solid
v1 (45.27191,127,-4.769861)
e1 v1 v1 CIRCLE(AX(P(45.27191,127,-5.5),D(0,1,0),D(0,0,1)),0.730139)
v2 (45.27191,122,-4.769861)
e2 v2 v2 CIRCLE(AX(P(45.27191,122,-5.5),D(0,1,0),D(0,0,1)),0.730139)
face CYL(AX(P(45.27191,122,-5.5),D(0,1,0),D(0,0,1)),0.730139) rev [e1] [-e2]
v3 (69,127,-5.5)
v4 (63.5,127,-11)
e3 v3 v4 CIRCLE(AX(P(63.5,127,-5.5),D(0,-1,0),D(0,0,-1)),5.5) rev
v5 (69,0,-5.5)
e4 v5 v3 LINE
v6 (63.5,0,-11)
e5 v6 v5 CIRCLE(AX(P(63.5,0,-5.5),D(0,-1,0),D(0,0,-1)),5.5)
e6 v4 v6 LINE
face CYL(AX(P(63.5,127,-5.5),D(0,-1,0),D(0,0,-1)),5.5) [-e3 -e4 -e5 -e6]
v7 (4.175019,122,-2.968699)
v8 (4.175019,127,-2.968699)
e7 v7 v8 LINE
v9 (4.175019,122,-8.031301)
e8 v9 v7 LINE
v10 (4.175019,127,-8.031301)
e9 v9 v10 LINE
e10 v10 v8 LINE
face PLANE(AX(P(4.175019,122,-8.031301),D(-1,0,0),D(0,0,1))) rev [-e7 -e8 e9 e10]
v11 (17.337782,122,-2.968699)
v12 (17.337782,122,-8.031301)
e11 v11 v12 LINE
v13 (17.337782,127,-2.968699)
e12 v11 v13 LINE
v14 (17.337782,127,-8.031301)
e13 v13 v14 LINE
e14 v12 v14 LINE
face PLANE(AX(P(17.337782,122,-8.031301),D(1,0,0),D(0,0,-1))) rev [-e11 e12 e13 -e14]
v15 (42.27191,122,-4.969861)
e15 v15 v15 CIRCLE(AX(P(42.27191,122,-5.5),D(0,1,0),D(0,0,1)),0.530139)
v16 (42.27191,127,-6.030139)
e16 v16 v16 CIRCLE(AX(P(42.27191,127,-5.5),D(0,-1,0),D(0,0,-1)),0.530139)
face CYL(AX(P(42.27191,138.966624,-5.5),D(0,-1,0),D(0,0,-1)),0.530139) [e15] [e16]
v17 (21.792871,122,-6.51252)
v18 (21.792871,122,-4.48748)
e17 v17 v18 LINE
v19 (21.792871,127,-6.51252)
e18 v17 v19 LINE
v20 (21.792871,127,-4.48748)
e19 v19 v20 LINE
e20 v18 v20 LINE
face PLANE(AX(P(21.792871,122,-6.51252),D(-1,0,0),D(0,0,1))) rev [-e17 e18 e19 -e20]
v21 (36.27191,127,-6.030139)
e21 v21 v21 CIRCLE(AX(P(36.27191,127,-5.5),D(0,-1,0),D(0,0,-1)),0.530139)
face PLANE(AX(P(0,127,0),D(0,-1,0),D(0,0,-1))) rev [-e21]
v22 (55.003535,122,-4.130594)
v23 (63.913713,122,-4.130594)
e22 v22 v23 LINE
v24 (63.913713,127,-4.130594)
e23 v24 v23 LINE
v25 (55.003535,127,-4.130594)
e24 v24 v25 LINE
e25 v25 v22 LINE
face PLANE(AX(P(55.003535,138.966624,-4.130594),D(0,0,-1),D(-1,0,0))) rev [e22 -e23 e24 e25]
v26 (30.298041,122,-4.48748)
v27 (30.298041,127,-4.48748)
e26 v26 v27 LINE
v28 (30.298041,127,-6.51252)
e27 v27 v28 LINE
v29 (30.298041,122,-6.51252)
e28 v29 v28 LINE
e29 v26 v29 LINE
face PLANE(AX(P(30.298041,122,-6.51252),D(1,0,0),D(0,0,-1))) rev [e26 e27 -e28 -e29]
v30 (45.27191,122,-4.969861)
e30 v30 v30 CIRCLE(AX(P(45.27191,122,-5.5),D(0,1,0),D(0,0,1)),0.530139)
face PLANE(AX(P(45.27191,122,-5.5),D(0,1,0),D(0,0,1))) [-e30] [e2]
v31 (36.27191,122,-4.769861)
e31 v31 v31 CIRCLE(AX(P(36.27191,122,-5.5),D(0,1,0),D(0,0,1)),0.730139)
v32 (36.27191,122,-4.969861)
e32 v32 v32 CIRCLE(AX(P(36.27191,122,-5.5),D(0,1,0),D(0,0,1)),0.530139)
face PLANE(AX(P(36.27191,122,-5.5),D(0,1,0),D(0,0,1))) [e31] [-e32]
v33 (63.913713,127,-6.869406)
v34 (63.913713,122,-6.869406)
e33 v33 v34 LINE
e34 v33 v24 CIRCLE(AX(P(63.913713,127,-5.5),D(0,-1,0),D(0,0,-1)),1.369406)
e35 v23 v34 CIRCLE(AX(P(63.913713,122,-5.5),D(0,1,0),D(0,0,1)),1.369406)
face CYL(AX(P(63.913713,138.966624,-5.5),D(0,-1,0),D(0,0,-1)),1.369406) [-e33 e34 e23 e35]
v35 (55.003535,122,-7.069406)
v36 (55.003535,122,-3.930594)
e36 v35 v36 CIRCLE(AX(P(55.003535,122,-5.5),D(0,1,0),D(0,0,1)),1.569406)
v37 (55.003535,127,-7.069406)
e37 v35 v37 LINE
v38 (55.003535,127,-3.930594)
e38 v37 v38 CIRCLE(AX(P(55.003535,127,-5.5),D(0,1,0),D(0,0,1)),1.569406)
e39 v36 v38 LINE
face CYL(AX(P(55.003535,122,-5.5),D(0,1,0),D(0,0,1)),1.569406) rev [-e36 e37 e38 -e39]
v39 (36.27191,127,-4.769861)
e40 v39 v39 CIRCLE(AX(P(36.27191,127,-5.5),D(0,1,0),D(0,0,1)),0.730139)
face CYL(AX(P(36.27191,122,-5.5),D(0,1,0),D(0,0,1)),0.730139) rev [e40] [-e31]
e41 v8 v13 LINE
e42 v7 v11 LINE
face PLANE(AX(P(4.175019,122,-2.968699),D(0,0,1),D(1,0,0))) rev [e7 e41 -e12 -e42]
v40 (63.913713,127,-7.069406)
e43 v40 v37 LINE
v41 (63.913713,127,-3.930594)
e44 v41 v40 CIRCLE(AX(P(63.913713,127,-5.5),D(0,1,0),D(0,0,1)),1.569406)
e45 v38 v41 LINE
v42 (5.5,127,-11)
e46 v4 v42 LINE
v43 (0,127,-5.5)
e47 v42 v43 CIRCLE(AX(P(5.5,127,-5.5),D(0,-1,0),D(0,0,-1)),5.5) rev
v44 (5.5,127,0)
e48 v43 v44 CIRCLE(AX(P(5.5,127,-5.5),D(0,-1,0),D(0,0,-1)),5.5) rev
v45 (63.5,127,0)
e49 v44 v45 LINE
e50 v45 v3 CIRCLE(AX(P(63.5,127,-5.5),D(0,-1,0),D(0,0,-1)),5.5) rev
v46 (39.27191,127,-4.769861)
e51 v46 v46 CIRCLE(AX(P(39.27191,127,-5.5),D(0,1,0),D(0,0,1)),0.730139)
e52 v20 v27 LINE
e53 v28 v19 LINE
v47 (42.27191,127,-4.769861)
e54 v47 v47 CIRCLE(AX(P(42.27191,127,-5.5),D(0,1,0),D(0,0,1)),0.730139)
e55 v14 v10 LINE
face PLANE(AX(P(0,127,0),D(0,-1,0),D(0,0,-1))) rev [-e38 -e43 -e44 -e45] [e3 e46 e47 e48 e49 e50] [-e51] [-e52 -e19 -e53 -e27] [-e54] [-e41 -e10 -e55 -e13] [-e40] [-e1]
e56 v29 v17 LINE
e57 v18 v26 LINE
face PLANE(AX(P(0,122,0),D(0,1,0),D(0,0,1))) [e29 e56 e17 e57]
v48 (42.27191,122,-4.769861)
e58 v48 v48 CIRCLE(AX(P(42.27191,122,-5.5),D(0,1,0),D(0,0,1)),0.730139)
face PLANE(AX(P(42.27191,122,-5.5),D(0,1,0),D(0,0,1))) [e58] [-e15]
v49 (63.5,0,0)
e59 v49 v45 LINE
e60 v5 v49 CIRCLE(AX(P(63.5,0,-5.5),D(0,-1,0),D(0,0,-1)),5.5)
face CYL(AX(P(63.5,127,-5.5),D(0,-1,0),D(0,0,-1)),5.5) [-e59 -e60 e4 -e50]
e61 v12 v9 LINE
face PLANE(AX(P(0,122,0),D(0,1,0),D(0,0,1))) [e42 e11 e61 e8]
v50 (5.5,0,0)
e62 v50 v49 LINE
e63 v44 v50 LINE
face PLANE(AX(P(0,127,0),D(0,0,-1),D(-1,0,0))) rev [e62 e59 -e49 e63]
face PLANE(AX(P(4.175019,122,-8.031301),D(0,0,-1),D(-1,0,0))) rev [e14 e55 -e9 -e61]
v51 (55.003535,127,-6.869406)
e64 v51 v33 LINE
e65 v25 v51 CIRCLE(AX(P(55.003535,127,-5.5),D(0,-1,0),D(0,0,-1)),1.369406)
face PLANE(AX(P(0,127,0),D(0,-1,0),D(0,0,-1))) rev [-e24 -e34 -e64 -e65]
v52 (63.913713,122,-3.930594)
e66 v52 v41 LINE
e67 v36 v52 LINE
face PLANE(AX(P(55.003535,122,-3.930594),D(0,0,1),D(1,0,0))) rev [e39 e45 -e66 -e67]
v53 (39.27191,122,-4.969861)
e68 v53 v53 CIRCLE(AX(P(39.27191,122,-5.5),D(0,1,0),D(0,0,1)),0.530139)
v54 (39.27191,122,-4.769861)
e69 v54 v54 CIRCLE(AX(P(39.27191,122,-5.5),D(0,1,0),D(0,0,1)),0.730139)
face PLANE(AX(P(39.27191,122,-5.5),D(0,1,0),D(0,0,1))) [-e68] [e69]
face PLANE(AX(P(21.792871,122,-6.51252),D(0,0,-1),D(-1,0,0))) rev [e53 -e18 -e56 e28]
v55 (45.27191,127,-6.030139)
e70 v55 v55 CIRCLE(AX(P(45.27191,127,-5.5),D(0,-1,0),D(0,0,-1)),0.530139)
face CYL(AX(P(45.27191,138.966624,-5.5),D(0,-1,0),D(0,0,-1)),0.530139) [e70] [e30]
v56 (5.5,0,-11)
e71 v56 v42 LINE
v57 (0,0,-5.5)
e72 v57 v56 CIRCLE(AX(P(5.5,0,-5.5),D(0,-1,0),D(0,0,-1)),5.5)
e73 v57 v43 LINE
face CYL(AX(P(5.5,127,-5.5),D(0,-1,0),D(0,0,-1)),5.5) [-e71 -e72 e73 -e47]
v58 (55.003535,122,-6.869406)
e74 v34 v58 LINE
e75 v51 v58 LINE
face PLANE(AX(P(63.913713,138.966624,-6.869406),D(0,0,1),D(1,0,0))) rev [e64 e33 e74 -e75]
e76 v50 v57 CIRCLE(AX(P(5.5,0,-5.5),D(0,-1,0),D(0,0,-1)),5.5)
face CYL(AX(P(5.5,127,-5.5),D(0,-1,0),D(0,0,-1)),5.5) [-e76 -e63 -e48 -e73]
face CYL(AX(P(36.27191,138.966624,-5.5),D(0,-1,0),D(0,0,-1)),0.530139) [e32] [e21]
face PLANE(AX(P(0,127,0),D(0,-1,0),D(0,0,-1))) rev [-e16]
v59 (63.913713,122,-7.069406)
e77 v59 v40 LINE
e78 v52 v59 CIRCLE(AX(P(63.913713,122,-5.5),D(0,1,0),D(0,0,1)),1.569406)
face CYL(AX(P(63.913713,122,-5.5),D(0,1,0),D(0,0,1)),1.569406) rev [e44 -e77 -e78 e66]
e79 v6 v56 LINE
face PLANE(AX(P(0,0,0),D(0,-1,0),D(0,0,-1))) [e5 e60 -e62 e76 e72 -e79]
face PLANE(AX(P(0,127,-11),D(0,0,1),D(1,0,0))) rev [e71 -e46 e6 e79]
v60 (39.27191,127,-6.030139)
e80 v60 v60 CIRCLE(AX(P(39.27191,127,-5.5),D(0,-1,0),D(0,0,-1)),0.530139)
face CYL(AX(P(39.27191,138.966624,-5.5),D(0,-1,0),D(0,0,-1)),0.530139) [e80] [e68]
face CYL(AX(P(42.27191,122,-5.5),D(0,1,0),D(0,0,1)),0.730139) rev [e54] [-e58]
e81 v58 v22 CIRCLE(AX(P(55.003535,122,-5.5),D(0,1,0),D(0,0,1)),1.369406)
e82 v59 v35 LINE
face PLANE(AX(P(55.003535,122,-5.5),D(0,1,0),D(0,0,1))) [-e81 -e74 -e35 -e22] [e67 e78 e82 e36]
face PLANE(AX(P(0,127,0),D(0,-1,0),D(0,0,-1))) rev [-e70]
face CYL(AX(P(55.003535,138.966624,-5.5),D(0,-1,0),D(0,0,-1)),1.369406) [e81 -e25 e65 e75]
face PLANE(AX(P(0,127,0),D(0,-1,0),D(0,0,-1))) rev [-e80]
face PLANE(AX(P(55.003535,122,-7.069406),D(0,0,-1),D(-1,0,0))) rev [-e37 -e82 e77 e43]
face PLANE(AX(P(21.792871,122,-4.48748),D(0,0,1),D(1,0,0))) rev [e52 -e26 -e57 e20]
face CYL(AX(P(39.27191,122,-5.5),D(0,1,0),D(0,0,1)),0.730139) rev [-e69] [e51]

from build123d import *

# Parameters (mm, degrees)
SKETCH1_W           = 69
SKETCH1_H           = 11
BOSS_EXTRUDE1_DEPTH = 127
FILLET1_R           = 5.5
SKETCH2_R           = 0.730138729
SKETCH2_W           = 13.16276312
SKETCH2_H           = 5.0626012
SKETCH2_W_2         = 8.505170017
SKETCH2_H_2         = 2.02504048
CUT_EXTRUDE1_DEPTH  = 5
SKETCH3_R           = 0.530138729
BOSS_EXTRUDE2_DEPTH = 5


with BuildPart() as part:
    # Sketch1 → Boss-Extrude1 (new body)
    with BuildSketch(Plane(origin=(0, 0, 0), x_dir=(1, 0, 0), z_dir=(0, 1, 0))):
        with Locations((34.5, 5.5)):
            Rectangle(SKETCH1_W, SKETCH1_H)
    extrude(amount=BOSS_EXTRUDE1_DEPTH)

    # Fillet1
    fillet1_edges = [part.edges().sort_by_distance(p)[0] for p in [
        (69, 63.5, 0),
        (69, 63.5, -11),
        (0, 63.5, -11),
        (0, 63.5, 0),
    ]]
    fillet(fillet1_edges, radius=FILLET1_R - 0.0001)  # a hair under: the kernel refuses the full size

    # Sketch2 → Cut-Extrude1 (cut)
    with BuildSketch(Plane(origin=(0, 127, 0), x_dir=(1, 0, 0), z_dir=(0, 1, 0))):
        with Locations(Location((36.27191042, 5.5, 0), (0, 0, 270))):
            Circle(SKETCH2_R)
        with Locations(Location((39.27191042, 5.5, 0), (0, 0, 270))):
            Circle(SKETCH2_R)
        with Locations(Location((42.27191042, 5.5, 0), (0, 0, 270))):
            Circle(SKETCH2_R)
        with Locations(Location((45.27191042, 5.5, 0), (0, 0, 270))):
            Circle(SKETCH2_R)
        with Locations((10.756400371, 5.5)):
            Rectangle(SKETCH2_W, SKETCH2_H)
        with Locations((26.045455995, 5.5)):
            Rectangle(SKETCH2_W_2, SKETCH2_H_2)
        with BuildLine():
            Line((55.003534861, 7.069406372), (63.913712973, 7.069406372))
            ThreePointArc((63.913712973, 7.069406372), (65.483119345, 5.5), (63.913712973, 3.930593628))
            Line((63.913712973, 3.930593628), (55.003534861, 3.930593628))
            ThreePointArc((55.003534861, 3.930593628), (53.434128489, 5.5), (55.003534861, 7.069406372))
        make_face()
    extrude(amount=-CUT_EXTRUDE1_DEPTH, mode=Mode.SUBTRACT)

    # Sketch3 → Boss-Extrude2 (add)
    with BuildSketch(Plane(origin=(0, 122, 0), x_dir=(1, 0, 0), z_dir=(0, 1, 0))):
        with Locations(Location((36.27191042, 5.5, 0), (0, 0, 90))):
            Circle(SKETCH3_R)
        with Locations(Location((39.27191042, 5.5, 0), (0, 0, 90))):
            Circle(SKETCH3_R)
        with Locations(Location((42.27191042, 5.5, 0), (0, 0, 90))):
            Circle(SKETCH3_R)
        with Locations(Location((45.27191042, 5.5, 0), (0, 0, 90))):
            Circle(SKETCH3_R)
        with BuildLine():
            Line((55.003534861, 4.130593628), (63.913712973, 4.130593628))
            ThreePointArc((63.913712973, 4.130593628), (65.283119345, 5.5), (63.913712973, 6.869406372))
            Line((63.913712973, 6.869406372), (55.003534861, 6.869406372))
            ThreePointArc((55.003534861, 6.869406372), (53.634128489, 5.5), (55.003534861, 4.130593628))
        make_face()
    extrude(amount=BOSS_EXTRUDE2_DEPTH)


solid = part.part
